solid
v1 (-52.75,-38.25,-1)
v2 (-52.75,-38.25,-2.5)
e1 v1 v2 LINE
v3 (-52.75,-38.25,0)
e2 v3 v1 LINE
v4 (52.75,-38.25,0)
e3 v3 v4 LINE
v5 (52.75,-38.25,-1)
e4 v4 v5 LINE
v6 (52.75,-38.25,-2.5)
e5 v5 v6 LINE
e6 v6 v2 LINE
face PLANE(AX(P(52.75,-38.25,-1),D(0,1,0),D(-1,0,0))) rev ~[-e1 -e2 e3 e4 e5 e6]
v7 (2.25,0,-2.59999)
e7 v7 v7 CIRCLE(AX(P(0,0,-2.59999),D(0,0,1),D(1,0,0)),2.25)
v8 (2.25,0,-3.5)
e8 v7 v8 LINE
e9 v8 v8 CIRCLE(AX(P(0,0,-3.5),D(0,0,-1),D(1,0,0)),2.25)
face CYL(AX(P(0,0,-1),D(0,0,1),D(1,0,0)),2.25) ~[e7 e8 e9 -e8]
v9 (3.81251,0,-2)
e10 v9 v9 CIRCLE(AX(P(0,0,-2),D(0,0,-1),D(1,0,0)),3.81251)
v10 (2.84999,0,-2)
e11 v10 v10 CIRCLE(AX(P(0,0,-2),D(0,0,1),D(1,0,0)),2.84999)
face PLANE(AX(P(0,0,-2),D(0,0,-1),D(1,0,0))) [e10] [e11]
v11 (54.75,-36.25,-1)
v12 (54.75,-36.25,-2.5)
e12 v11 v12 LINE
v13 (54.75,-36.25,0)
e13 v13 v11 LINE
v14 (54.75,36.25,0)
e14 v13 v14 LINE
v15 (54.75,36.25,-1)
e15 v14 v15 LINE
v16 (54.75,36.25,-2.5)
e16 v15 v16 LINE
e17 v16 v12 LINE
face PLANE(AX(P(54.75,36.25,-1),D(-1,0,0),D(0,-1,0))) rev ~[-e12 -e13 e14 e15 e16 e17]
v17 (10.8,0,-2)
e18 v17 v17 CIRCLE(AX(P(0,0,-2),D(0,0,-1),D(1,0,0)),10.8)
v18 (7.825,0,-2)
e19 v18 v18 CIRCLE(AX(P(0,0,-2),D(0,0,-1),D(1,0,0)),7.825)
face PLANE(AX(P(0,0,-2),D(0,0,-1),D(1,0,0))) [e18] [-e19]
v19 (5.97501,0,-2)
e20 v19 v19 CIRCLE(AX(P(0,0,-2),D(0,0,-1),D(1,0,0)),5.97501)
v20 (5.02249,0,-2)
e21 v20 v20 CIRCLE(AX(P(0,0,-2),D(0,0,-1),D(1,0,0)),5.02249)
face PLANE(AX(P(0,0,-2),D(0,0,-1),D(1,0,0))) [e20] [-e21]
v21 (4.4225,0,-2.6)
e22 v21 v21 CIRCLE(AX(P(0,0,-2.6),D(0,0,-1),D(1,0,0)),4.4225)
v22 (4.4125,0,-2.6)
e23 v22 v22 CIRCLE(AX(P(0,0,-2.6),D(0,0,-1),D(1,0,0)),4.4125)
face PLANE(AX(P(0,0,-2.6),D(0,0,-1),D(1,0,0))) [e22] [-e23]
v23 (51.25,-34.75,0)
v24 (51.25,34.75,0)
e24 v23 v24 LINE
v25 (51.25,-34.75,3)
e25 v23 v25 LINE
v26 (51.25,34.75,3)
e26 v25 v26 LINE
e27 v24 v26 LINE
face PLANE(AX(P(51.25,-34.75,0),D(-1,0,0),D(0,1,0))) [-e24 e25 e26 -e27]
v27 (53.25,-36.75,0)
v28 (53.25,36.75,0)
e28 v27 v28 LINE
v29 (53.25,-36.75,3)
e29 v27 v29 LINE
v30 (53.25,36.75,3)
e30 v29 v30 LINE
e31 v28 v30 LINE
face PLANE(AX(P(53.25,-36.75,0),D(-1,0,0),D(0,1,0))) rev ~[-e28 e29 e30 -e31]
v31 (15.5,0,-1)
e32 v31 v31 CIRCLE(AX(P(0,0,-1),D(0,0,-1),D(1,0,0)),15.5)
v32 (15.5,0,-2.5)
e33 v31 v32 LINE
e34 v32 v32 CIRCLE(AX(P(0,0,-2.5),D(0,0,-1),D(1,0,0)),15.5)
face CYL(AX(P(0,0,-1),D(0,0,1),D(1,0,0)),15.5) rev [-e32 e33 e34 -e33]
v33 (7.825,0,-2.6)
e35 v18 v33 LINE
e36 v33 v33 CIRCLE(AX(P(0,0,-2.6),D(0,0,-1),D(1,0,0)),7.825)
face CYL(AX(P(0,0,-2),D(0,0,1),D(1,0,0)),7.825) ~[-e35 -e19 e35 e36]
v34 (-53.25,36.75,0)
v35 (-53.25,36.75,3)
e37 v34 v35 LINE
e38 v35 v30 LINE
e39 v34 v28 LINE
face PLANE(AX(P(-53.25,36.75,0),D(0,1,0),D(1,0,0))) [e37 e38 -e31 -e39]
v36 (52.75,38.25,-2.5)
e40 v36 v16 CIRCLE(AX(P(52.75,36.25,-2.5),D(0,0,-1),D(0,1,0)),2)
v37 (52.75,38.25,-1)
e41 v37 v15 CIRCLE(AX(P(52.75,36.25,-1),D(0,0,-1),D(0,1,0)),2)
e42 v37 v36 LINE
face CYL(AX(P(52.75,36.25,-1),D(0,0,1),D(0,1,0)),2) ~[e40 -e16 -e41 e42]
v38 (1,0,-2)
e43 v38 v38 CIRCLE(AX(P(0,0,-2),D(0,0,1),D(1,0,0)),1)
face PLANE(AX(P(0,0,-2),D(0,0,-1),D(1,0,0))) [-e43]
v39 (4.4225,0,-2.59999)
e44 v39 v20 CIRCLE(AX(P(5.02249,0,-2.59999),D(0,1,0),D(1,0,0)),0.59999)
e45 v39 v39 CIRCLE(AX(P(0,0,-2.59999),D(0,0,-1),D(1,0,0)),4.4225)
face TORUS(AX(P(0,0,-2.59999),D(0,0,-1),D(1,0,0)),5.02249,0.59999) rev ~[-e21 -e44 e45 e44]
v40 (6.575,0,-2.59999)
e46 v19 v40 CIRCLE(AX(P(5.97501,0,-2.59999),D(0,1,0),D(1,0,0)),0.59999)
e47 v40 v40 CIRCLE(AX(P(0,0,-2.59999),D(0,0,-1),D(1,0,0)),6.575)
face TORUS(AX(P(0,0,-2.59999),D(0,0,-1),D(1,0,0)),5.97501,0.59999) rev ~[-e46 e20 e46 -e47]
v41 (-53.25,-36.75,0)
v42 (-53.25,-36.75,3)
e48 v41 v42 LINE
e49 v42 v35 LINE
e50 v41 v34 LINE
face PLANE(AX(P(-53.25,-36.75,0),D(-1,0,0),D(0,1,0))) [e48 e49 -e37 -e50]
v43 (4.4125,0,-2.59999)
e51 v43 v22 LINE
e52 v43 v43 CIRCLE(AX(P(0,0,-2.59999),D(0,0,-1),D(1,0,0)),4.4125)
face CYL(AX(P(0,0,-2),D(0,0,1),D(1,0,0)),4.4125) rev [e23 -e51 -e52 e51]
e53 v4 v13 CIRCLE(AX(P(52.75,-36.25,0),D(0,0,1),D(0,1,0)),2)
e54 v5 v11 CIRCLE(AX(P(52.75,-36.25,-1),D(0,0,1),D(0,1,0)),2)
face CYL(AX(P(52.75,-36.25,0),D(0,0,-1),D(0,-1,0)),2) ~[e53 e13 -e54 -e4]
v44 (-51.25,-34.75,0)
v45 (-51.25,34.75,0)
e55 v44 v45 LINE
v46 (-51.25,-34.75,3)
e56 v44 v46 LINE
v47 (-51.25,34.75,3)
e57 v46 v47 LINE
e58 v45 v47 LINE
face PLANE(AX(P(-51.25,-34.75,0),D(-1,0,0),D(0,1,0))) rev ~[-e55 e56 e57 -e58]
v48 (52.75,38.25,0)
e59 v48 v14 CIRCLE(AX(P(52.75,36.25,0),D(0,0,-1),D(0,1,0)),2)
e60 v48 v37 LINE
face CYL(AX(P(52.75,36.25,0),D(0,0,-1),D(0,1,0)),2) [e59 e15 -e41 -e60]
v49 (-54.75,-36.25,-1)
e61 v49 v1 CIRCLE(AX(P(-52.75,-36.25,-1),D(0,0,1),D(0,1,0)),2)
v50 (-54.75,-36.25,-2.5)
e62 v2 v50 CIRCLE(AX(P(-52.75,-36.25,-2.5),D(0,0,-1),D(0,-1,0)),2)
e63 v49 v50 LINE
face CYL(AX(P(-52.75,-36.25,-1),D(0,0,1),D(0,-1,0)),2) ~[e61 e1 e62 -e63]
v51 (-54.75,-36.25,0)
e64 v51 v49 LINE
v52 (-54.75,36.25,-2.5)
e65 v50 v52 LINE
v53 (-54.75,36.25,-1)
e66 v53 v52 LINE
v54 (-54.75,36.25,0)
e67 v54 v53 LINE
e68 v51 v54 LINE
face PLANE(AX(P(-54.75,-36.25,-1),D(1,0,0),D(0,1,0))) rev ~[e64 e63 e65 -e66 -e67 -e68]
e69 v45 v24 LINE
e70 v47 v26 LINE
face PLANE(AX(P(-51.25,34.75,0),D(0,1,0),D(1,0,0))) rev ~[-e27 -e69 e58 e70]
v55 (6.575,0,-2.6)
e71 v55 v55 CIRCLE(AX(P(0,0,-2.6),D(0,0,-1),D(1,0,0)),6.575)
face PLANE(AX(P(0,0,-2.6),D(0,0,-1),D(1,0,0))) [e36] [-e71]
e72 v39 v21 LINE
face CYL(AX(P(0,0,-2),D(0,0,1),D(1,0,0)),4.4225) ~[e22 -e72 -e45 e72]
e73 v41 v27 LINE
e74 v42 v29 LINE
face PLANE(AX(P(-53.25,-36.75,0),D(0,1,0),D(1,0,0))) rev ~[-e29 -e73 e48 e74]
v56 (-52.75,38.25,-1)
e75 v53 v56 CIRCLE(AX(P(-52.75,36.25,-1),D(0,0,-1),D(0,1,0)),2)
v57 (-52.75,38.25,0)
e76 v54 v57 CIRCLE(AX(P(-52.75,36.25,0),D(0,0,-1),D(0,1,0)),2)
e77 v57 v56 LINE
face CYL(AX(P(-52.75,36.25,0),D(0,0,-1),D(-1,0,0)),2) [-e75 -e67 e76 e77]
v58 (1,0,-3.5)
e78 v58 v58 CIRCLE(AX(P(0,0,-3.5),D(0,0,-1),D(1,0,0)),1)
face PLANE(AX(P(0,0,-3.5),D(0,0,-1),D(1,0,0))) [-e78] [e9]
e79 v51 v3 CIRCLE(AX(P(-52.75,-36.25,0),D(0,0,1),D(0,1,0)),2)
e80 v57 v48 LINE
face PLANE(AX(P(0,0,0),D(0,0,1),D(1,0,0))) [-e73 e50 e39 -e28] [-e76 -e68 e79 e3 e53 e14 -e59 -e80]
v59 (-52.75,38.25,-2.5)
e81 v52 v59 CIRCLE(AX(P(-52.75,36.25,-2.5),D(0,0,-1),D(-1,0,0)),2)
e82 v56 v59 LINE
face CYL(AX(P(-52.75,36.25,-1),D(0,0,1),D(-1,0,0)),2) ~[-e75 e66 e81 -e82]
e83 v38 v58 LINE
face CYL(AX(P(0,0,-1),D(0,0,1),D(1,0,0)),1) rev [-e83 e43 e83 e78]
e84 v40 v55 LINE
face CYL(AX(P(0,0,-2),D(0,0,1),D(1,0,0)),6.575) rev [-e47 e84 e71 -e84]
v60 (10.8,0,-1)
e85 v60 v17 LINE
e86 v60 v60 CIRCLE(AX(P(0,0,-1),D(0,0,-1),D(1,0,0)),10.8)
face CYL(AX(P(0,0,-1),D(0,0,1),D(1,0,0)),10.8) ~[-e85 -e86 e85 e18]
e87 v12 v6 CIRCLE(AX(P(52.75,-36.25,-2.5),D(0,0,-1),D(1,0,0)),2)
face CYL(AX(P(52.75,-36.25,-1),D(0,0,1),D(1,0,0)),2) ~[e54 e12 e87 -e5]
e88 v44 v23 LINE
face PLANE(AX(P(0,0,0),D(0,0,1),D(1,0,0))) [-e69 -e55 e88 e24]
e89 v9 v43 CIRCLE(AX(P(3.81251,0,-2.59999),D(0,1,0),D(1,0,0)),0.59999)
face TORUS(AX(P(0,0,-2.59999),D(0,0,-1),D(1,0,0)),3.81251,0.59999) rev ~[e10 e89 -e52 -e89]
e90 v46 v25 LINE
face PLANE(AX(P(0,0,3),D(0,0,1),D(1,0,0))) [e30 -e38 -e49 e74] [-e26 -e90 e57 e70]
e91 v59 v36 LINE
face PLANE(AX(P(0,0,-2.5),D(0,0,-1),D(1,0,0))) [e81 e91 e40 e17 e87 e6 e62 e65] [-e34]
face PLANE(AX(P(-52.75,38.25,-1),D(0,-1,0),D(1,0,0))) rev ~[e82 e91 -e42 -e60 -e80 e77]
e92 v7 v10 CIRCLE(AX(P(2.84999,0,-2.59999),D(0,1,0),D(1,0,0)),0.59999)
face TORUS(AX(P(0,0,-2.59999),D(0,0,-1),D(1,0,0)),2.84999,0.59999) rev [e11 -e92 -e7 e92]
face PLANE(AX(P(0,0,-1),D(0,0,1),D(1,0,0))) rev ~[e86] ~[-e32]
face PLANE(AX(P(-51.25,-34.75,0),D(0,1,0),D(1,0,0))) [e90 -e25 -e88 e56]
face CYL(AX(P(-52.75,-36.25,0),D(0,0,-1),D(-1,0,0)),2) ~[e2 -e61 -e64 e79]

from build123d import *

# Parameters (mm, degrees)
F2_W      = 109.5
F2_H      = 76.5
F3_DEPTH  = 1
F1_W      = 106.5
F1_H      = 73.5
F4_DEPTH  = 3
F0_W      = 102.5
F0_H      = 69.5
F5_DEPTH  = 3
F6_R      = 10.8
F7_DEPTH  = 1
F8_R      = 2.25
F8_R_2    = 1
F9_DEPTH  = 2.5
F10_R     = 7.825
F10_R_2   = 6.575
F11_DEPTH = 0.6
F12_R     = 4.4225
F12_R_2   = 4.4125
F13_DEPTH = 0.6
F14_R     = 0.59999
F15_R     = 2
F16_R     = 15.5
F17_DEPTH = 1.5


# Not quite as in the source:
# - a fillet or chamfer is up to 0.001 mm smaller than in the source, because OpenCascade refuses the exact size


with BuildPart() as f3:
    # F2 (on Top) → F3 (new body)
    with BuildSketch(Plane.XY):
        Rectangle(F2_W, F2_H)
    extrude(amount=-F3_DEPTH)

    # F1 (on Top) → F4 (join)
    with BuildSketch(Plane.XY):
        Rectangle(F1_W, F1_H)
    extrude(amount=F4_DEPTH)

    # F0 (on Top) → F5 (cut, through all)
    with BuildSketch(Plane.XY):
        Rectangle(F0_W, F0_H)
    extrude(amount=F5_DEPTH, mode=Mode.SUBTRACT)

    # F6 (on face) → F7 (join)
    with BuildSketch(Plane(origin=(0, 0, -1), x_dir=(1, 0, 0), z_dir=(0, 0, -1))):
        Circle(F6_R)
    extrude(amount=F7_DEPTH)

    # F8 (on face) → F9 (join)
    with BuildSketch(Plane(origin=(0, 0, -1), x_dir=(1, 0, 0), z_dir=(0, 0, -1))):
        Circle(F8_R)
        Circle(F8_R_2, mode=Mode.SUBTRACT)
    extrude(amount=F9_DEPTH)

    # F10 (on face) → F11 (join)
    with BuildSketch(Plane(origin=(0, 0, -2), x_dir=(1, 0, 0), z_dir=(0, 0, -1))):
        Circle(F10_R)
        Circle(F10_R_2, mode=Mode.SUBTRACT)
    extrude(amount=F11_DEPTH)

    # F12 (on face) → F13 (join)
    with BuildSketch(Plane(origin=(0, 0, -2), x_dir=(1, 0, 0), z_dir=(0, 0, -1))):
        Circle(F12_R)
        Circle(F12_R_2, mode=Mode.SUBTRACT)
    extrude(amount=F13_DEPTH)

    # F14 (radius 0.6 in the source; OpenCascade refuses exactly that, so slightly less here)
    f14_edges = [f3.edges().sort_by_distance(p)[0] for p in [
        (-4.4225, 0, -2),
        (-6.575, 0, -2),
        (-2.25, 0, -2),
        (-4.4125, 0, -2),
    ]]
    fillet(f14_edges, radius=F14_R)

    # F15
    f15_edges = [f3.edges().sort_by_distance(p)[0] for p in [
        (-54.75, -38.25, -0.5),
        (54.75, -38.25, -0.5),
        (54.75, 38.25, -0.5),
        (-54.75, 38.25, -0.5),
    ]]
    fillet(f15_edges, radius=F15_R)

    # F16 (on face) → F17 (join)
    with BuildSketch(Plane(origin=(0, 0, -1), x_dir=(1, 0, 0), z_dir=(0, 0, -1))):
        with BuildLine():
            ThreePointArc((-52.75, 38.25), (-54.1642135624, 37.6642135624), (-54.75, 36.25))
            Line((-54.75, 36.25), (-54.75, -36.25))
            ThreePointArc((-54.75, -36.25), (-54.1642135624, -37.6642135624), (-52.75, -38.25))
            Line((-52.75, -38.25), (52.75, -38.25))
            ThreePointArc((52.75, -38.25), (54.1642135624, -37.6642135624), (54.75, -36.25))
            Line((54.75, -36.25), (54.75, 36.25))
            ThreePointArc((54.75, 36.25), (54.1642135624, 37.6642135624), (52.75, 38.25))
            Line((52.75, 38.25), (-52.75, 38.25))
        make_face()
        Circle(F16_R, mode=Mode.SUBTRACT)
    extrude(amount=F17_DEPTH)


solid = f3.part
